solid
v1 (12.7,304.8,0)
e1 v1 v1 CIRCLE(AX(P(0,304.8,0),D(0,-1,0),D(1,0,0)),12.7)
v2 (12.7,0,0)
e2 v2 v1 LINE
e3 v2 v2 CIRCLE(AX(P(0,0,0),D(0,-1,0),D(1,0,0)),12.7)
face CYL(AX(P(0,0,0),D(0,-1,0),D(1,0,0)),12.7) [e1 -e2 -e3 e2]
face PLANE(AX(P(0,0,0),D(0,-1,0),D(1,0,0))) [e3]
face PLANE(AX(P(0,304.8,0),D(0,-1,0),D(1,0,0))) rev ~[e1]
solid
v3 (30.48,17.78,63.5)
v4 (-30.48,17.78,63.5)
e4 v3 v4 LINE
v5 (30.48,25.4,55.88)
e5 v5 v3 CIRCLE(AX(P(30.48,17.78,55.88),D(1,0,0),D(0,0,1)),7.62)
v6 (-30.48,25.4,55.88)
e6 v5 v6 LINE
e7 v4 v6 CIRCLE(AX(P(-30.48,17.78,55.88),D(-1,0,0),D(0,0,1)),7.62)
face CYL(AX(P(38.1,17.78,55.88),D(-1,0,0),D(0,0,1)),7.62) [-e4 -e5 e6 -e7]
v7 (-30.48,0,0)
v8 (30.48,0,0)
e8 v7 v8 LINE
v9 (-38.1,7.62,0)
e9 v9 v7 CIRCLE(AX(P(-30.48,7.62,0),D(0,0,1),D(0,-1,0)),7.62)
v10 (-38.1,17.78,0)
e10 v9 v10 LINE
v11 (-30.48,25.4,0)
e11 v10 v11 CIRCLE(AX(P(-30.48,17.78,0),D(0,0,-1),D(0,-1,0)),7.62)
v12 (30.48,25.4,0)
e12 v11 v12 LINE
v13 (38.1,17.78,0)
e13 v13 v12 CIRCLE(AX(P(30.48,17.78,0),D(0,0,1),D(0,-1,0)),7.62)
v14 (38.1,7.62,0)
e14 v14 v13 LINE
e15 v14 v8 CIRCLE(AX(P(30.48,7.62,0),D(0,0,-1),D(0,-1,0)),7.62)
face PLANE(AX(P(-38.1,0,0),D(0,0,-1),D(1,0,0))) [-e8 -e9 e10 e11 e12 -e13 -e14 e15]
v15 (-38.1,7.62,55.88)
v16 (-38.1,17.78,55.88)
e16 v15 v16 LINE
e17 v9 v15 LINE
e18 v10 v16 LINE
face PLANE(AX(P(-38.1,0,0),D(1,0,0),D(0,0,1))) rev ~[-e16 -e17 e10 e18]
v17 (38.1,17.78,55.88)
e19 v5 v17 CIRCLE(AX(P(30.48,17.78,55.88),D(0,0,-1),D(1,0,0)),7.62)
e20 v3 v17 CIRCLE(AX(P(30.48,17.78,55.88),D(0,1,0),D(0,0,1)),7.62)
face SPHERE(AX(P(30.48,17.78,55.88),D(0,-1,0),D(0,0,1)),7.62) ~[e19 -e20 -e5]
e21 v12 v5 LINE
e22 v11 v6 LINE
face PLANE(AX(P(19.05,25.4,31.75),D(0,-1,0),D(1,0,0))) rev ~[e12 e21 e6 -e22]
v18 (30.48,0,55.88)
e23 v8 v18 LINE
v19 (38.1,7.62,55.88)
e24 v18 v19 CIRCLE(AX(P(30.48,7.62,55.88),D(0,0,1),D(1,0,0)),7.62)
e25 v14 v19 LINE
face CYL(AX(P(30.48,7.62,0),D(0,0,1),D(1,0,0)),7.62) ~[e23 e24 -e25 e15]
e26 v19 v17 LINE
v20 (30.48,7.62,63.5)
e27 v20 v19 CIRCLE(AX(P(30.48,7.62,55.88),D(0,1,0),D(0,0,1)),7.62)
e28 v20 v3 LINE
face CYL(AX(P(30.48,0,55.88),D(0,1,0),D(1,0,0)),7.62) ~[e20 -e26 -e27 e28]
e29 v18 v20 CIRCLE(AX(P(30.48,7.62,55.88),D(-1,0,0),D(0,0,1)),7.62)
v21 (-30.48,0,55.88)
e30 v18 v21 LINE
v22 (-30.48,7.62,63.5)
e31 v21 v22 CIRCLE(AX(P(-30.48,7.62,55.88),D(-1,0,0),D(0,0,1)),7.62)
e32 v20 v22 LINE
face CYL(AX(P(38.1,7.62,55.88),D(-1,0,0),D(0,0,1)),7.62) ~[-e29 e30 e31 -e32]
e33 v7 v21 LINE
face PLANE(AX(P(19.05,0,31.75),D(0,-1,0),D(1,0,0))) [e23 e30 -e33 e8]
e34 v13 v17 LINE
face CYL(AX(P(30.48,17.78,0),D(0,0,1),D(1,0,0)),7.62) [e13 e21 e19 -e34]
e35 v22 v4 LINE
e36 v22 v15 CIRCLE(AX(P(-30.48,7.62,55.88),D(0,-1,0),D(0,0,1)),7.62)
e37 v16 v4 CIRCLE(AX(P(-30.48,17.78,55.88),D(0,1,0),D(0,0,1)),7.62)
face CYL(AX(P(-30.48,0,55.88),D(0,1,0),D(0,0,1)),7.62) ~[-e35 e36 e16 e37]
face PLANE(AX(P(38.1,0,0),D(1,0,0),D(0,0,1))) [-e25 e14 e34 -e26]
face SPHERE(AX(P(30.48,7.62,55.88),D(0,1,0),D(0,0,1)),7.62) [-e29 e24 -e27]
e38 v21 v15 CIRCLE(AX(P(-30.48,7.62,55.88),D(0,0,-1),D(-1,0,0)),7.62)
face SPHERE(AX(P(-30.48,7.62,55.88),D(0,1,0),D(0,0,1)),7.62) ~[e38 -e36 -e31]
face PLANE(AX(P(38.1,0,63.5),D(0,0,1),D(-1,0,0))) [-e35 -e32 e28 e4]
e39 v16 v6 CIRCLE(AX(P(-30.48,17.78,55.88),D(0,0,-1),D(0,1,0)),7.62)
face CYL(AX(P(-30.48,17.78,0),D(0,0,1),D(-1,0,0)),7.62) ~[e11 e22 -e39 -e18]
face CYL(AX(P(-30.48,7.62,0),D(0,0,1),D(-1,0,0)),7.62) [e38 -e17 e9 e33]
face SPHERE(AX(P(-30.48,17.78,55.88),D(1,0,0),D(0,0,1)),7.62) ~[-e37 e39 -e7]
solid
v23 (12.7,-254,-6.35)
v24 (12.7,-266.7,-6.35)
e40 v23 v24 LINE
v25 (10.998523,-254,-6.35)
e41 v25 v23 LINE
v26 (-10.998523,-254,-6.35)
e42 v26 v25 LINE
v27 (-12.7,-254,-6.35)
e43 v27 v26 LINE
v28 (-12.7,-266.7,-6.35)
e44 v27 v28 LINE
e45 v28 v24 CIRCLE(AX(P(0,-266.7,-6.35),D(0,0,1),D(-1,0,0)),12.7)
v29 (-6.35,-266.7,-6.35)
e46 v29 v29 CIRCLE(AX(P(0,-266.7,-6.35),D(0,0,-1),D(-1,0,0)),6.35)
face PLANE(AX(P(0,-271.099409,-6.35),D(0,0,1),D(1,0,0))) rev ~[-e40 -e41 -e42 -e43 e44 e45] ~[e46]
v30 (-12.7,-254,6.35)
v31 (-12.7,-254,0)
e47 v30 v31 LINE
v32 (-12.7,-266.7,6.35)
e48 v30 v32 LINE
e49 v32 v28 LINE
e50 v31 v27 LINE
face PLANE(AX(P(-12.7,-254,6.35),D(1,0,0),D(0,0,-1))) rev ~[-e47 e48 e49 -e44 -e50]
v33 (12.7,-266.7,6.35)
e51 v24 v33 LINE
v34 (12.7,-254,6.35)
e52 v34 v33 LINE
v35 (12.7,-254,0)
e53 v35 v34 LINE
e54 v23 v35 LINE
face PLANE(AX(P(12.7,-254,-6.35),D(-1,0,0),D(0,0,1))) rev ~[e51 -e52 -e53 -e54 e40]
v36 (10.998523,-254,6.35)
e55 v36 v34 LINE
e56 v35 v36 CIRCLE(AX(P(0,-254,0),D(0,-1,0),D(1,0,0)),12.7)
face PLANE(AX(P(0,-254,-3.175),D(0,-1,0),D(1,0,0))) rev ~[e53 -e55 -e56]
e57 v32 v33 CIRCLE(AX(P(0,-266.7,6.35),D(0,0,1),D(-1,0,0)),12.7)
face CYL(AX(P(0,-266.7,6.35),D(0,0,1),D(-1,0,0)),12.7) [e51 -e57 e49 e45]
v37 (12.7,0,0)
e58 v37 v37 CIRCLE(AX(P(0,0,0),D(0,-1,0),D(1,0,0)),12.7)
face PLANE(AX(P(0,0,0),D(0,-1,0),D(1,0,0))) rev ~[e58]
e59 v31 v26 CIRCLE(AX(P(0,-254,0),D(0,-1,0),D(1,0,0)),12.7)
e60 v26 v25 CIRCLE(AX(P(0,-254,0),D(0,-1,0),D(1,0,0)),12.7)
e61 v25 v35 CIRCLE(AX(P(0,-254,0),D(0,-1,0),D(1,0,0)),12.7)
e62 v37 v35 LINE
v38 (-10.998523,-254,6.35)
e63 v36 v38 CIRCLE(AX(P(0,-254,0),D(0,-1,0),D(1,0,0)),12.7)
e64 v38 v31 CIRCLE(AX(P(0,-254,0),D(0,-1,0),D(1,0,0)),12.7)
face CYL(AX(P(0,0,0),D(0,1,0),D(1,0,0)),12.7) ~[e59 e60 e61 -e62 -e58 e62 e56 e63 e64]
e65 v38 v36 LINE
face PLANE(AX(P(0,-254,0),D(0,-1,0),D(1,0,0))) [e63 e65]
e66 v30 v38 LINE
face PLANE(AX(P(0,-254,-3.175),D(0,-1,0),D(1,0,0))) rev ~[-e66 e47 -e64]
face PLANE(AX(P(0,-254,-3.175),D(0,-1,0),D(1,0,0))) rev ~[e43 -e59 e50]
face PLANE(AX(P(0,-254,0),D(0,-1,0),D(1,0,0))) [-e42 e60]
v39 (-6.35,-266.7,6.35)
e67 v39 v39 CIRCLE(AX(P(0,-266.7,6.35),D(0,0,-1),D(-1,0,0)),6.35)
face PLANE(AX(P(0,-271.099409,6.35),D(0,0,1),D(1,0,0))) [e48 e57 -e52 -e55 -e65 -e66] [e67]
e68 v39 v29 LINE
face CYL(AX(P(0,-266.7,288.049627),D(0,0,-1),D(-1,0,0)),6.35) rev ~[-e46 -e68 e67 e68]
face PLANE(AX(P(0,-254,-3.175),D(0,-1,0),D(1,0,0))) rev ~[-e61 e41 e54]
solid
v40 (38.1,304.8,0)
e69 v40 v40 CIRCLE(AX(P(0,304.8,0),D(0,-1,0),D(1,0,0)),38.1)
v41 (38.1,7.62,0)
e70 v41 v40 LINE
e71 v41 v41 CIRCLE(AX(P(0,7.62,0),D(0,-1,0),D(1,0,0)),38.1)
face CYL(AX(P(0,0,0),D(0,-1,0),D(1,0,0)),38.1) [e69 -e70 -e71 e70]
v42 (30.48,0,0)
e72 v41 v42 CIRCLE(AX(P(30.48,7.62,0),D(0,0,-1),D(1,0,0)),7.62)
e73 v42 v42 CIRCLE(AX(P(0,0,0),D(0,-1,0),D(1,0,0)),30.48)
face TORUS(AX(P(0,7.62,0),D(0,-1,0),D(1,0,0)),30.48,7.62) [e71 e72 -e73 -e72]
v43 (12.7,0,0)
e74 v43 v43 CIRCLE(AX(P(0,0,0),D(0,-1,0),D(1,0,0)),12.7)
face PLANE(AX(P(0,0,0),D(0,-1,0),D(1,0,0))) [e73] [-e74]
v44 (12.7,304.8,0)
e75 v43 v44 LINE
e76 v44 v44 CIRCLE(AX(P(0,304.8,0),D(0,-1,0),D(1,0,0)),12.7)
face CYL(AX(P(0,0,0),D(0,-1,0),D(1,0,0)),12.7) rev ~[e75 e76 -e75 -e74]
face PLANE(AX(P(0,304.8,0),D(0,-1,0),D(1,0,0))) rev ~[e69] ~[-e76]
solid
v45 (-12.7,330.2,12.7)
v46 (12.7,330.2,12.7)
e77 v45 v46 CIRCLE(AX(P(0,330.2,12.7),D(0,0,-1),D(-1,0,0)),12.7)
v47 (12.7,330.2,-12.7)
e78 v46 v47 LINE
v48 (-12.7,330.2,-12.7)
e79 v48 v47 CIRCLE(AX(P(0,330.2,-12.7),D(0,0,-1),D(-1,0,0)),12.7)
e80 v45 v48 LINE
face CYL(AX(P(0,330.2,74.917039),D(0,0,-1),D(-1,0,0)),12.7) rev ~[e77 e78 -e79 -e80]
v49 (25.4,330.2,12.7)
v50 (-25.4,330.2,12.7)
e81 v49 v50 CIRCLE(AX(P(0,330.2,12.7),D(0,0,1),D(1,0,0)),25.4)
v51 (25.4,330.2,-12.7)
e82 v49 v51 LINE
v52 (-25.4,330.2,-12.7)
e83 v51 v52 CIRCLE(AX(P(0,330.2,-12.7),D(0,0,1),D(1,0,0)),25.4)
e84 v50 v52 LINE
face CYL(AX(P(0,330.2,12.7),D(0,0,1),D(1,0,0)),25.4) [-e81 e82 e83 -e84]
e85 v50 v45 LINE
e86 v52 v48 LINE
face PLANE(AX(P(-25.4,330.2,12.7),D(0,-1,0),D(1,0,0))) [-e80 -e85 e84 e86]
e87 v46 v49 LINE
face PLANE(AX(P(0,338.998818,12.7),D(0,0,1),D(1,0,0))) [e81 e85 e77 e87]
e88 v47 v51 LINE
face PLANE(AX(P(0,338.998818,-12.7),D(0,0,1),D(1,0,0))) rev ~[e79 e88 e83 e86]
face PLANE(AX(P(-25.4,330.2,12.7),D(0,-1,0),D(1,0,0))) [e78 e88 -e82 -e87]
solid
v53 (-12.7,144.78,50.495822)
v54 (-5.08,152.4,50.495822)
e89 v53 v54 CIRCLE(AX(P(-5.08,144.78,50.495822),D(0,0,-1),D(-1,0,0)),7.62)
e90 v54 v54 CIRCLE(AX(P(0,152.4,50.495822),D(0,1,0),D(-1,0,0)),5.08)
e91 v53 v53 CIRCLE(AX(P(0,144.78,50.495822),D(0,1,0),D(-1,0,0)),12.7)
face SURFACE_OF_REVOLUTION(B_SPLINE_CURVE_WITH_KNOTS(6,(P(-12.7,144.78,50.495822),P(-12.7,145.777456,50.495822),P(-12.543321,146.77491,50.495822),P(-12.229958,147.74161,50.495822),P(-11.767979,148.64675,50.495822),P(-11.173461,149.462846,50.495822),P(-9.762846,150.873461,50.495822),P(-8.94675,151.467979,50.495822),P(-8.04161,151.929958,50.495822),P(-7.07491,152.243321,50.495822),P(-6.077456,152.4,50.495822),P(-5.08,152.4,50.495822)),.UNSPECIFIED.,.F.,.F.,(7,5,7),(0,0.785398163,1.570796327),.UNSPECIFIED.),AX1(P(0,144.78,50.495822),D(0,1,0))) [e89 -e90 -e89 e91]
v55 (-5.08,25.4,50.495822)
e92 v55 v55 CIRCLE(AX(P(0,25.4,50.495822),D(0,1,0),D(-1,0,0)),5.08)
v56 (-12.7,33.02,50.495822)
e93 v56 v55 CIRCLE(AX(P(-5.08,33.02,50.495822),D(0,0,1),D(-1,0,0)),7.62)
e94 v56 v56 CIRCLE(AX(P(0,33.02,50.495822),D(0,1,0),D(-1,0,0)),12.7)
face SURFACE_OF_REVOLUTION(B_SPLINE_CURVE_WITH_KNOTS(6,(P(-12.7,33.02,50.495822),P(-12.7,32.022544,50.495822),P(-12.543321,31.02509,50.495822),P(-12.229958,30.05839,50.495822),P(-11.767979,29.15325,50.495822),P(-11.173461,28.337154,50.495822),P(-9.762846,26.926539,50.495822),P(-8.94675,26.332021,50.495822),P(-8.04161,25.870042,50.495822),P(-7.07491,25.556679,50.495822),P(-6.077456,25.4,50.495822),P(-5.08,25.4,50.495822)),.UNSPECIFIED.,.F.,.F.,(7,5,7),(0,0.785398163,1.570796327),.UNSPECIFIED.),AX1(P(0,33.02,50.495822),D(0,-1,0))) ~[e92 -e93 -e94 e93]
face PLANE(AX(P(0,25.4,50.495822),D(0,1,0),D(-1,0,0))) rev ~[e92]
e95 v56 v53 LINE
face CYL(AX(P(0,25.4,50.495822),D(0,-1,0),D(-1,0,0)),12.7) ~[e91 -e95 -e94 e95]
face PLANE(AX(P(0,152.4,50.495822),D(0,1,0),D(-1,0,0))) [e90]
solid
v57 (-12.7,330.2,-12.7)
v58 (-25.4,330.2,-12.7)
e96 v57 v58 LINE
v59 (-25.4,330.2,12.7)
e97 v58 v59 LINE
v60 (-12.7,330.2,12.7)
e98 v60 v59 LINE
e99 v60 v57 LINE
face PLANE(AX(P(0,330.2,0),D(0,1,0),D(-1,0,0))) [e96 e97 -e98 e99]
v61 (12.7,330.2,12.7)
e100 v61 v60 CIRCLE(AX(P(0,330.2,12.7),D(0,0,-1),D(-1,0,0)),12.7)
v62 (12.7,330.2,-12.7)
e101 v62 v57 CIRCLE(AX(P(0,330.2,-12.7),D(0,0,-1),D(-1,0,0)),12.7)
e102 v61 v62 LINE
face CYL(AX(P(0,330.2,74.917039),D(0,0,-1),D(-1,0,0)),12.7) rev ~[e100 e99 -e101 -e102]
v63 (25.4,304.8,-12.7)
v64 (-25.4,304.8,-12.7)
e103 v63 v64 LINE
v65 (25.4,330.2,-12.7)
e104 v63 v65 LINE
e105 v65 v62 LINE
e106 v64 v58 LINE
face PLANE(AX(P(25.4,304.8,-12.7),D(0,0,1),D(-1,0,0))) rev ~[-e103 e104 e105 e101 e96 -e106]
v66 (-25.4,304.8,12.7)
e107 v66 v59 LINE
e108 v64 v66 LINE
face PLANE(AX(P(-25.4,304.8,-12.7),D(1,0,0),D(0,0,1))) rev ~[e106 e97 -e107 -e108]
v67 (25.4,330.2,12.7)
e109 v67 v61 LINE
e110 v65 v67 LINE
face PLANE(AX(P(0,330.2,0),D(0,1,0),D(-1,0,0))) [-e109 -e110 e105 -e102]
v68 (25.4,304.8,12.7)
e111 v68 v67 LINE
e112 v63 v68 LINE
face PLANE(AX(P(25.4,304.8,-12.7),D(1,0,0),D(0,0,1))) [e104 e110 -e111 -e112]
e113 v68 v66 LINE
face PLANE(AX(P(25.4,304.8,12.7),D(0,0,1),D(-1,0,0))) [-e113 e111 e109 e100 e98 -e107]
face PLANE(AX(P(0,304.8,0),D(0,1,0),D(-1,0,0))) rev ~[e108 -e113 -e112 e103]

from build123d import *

# Parameters (mm, degrees)
F0_R      = 12.7
F1_DEPTH  = 254
F0_R_2    = 38.1
F2_DEPTH  = 304.8
F3_W      = 38.1
F3_H      = 63.5
F4_DEPTH  = 25.4
F5_R      = 12.7
F6_DEPTH  = 127
F7_DEPTH  = 304.8
F8_W      = 50.8
F8_H      = 25.4
F9_DEPTH  = 25.4
F11_DEPTH = 25.4
F13_D     = 25.4
F13_2_D   = 25.4
F14_R     = 7.62
F14_2_R   = 7.62
F14_3_R   = 7.62
F15_W     = 25.4
F15_H     = 6.3500005325
F16_DEPTH = 12.7
F18_DEPTH = 12.7
F20_D     = 12.7


# Not quite as in the source:
# - ends of sketch curves that miss each other by under 0.0002 mm in the source are joined


with BuildPart() as f1:
    # F0 (on Front) → F1 (new body)
    with BuildSketch(Plane.XZ):
        Circle(F0_R)
    extrude(amount=F1_DEPTH)


with BuildPart() as f2:
    # F0 (on Front) → F2 (new body)
    with BuildSketch(Plane.XZ):
        Circle(F0_R_2)
        Circle(F0_R, mode=Mode.SUBTRACT)
    extrude(amount=-F2_DEPTH)

    # F14#3
    f14_3_edges = [f2.edges().sort_by_distance(p)[0] for p in [
        (-38.1, 0, 0),
    ]]
    fillet(f14_3_edges, radius=F14_3_R)


with BuildPart() as f4:
    # F3 (on Front) → F4 (new body)
    with BuildSketch(Plane.XZ):
        with Locations((19.05, 31.75)):
            Rectangle(F3_W, F3_H)
        with Locations((-19.05, 31.75)):
            Rectangle(F3_W, F3_H)
    extrude(amount=-F4_DEPTH)

    # F14
    f14_edges = [f4.edges().sort_by_distance(p)[0] for p in [
        (38.1, 12.7, 63.5),
        (0, 25.4, 63.5),
        (-38.1, 12.7, 63.5),
        (0, 0, 63.5),
        (38.1, 25.4, 31.75),
        (38.1, 0, 31.75),
        (-38.1, 25.4, 31.75),
        (-38.1, 0, 31.75),
    ]]
    fillet(f14_edges, radius=F14_R)


with BuildPart() as f6:
    # F5 (on face) → F6 (new body)
    with BuildSketch(Plane(origin=(0, 25.4, 0), x_dir=(-1, 0, 0), z_dir=(0, 1, 0))):
        with Locations((0, 50.4958219826)):
            Circle(F5_R)
    extrude(amount=F6_DEPTH)

    # F14#2
    f14_2_edges = [f6.edges().sort_by_distance(p)[0] for p in [
        (12.7, 25.4, 50.495822),
        (12.7, 152.4, 50.495822),
    ]]
    fillet(f14_2_edges, radius=F14_2_R)


with BuildPart() as f7:
    # F7 (new): a face of the model
    f7_faces = [f1.part.faces().sort_by_distance(p)[0] for p in [
        (0, 0, 0),
    ]]
    extrude(f7_faces, amount=F7_DEPTH)


with BuildPart() as f9:
    # F8 (on face) → F9 (new body)
    with BuildSketch(Plane(origin=(0, 304.8, 0), x_dir=(-1, 0, 0), z_dir=(0, 1, 0))):
        Rectangle(F8_W, F8_H)
    extrude(amount=F9_DEPTH)

    # F13 (through all)
    with Locations(Plane.XY.offset(12.7)):
        with Locations((0, 330.2)):
            Hole(F13_D / 2)


with BuildPart() as f11:
    # F10 (on face) → F11 (new body)
    with BuildSketch(Plane.XY.offset(12.7)):
        with BuildLine():
            Line((-25.4, 330.2), (25.4, 330.2))
            ThreePointArc((25.4, 330.2), (0, 355.6), (-25.4, 330.2))
        make_face()
    extrude(amount=-F11_DEPTH)

    # F13#2 (through all)
    with Locations(Plane.XY.offset(12.7)):
        with Locations((0, 330.2)):
            Hole(F13_2_D / 2)


with BuildPart() as f1_1:
    add(f1.part)

    # F15 (on face) → F16 (join)
    with BuildSketch(Plane.XZ.offset(254)):
        Polygon((12.7, -6.35), (12.7, 0), (-12.7, -5.325e-07), (-12.7, -6.35), align=None)
        with Locations((0, 3.1749997337)):
            Rectangle(F15_W, F15_H)
    extrude(amount=F16_DEPTH)

    # F17 (on face) → F18 (join)
    with BuildSketch(Plane.XY.offset(6.35)):
        with BuildLine():
            Line((12.7, -266.7), (-12.7, -266.7))
            ThreePointArc((-12.7, -266.7), (0, -279.4), (12.7, -266.7))
        make_face()
    extrude(amount=-F18_DEPTH)

    # F20 (through all)
    with Locations(Plane.XY.offset(6.35)):
        with Locations((0, -266.7)):
            Hole(F20_D / 2)


solid = Compound([f2.part, f4.part, f6.part, f7.part, f9.part, f11.part, f1_1.part])
